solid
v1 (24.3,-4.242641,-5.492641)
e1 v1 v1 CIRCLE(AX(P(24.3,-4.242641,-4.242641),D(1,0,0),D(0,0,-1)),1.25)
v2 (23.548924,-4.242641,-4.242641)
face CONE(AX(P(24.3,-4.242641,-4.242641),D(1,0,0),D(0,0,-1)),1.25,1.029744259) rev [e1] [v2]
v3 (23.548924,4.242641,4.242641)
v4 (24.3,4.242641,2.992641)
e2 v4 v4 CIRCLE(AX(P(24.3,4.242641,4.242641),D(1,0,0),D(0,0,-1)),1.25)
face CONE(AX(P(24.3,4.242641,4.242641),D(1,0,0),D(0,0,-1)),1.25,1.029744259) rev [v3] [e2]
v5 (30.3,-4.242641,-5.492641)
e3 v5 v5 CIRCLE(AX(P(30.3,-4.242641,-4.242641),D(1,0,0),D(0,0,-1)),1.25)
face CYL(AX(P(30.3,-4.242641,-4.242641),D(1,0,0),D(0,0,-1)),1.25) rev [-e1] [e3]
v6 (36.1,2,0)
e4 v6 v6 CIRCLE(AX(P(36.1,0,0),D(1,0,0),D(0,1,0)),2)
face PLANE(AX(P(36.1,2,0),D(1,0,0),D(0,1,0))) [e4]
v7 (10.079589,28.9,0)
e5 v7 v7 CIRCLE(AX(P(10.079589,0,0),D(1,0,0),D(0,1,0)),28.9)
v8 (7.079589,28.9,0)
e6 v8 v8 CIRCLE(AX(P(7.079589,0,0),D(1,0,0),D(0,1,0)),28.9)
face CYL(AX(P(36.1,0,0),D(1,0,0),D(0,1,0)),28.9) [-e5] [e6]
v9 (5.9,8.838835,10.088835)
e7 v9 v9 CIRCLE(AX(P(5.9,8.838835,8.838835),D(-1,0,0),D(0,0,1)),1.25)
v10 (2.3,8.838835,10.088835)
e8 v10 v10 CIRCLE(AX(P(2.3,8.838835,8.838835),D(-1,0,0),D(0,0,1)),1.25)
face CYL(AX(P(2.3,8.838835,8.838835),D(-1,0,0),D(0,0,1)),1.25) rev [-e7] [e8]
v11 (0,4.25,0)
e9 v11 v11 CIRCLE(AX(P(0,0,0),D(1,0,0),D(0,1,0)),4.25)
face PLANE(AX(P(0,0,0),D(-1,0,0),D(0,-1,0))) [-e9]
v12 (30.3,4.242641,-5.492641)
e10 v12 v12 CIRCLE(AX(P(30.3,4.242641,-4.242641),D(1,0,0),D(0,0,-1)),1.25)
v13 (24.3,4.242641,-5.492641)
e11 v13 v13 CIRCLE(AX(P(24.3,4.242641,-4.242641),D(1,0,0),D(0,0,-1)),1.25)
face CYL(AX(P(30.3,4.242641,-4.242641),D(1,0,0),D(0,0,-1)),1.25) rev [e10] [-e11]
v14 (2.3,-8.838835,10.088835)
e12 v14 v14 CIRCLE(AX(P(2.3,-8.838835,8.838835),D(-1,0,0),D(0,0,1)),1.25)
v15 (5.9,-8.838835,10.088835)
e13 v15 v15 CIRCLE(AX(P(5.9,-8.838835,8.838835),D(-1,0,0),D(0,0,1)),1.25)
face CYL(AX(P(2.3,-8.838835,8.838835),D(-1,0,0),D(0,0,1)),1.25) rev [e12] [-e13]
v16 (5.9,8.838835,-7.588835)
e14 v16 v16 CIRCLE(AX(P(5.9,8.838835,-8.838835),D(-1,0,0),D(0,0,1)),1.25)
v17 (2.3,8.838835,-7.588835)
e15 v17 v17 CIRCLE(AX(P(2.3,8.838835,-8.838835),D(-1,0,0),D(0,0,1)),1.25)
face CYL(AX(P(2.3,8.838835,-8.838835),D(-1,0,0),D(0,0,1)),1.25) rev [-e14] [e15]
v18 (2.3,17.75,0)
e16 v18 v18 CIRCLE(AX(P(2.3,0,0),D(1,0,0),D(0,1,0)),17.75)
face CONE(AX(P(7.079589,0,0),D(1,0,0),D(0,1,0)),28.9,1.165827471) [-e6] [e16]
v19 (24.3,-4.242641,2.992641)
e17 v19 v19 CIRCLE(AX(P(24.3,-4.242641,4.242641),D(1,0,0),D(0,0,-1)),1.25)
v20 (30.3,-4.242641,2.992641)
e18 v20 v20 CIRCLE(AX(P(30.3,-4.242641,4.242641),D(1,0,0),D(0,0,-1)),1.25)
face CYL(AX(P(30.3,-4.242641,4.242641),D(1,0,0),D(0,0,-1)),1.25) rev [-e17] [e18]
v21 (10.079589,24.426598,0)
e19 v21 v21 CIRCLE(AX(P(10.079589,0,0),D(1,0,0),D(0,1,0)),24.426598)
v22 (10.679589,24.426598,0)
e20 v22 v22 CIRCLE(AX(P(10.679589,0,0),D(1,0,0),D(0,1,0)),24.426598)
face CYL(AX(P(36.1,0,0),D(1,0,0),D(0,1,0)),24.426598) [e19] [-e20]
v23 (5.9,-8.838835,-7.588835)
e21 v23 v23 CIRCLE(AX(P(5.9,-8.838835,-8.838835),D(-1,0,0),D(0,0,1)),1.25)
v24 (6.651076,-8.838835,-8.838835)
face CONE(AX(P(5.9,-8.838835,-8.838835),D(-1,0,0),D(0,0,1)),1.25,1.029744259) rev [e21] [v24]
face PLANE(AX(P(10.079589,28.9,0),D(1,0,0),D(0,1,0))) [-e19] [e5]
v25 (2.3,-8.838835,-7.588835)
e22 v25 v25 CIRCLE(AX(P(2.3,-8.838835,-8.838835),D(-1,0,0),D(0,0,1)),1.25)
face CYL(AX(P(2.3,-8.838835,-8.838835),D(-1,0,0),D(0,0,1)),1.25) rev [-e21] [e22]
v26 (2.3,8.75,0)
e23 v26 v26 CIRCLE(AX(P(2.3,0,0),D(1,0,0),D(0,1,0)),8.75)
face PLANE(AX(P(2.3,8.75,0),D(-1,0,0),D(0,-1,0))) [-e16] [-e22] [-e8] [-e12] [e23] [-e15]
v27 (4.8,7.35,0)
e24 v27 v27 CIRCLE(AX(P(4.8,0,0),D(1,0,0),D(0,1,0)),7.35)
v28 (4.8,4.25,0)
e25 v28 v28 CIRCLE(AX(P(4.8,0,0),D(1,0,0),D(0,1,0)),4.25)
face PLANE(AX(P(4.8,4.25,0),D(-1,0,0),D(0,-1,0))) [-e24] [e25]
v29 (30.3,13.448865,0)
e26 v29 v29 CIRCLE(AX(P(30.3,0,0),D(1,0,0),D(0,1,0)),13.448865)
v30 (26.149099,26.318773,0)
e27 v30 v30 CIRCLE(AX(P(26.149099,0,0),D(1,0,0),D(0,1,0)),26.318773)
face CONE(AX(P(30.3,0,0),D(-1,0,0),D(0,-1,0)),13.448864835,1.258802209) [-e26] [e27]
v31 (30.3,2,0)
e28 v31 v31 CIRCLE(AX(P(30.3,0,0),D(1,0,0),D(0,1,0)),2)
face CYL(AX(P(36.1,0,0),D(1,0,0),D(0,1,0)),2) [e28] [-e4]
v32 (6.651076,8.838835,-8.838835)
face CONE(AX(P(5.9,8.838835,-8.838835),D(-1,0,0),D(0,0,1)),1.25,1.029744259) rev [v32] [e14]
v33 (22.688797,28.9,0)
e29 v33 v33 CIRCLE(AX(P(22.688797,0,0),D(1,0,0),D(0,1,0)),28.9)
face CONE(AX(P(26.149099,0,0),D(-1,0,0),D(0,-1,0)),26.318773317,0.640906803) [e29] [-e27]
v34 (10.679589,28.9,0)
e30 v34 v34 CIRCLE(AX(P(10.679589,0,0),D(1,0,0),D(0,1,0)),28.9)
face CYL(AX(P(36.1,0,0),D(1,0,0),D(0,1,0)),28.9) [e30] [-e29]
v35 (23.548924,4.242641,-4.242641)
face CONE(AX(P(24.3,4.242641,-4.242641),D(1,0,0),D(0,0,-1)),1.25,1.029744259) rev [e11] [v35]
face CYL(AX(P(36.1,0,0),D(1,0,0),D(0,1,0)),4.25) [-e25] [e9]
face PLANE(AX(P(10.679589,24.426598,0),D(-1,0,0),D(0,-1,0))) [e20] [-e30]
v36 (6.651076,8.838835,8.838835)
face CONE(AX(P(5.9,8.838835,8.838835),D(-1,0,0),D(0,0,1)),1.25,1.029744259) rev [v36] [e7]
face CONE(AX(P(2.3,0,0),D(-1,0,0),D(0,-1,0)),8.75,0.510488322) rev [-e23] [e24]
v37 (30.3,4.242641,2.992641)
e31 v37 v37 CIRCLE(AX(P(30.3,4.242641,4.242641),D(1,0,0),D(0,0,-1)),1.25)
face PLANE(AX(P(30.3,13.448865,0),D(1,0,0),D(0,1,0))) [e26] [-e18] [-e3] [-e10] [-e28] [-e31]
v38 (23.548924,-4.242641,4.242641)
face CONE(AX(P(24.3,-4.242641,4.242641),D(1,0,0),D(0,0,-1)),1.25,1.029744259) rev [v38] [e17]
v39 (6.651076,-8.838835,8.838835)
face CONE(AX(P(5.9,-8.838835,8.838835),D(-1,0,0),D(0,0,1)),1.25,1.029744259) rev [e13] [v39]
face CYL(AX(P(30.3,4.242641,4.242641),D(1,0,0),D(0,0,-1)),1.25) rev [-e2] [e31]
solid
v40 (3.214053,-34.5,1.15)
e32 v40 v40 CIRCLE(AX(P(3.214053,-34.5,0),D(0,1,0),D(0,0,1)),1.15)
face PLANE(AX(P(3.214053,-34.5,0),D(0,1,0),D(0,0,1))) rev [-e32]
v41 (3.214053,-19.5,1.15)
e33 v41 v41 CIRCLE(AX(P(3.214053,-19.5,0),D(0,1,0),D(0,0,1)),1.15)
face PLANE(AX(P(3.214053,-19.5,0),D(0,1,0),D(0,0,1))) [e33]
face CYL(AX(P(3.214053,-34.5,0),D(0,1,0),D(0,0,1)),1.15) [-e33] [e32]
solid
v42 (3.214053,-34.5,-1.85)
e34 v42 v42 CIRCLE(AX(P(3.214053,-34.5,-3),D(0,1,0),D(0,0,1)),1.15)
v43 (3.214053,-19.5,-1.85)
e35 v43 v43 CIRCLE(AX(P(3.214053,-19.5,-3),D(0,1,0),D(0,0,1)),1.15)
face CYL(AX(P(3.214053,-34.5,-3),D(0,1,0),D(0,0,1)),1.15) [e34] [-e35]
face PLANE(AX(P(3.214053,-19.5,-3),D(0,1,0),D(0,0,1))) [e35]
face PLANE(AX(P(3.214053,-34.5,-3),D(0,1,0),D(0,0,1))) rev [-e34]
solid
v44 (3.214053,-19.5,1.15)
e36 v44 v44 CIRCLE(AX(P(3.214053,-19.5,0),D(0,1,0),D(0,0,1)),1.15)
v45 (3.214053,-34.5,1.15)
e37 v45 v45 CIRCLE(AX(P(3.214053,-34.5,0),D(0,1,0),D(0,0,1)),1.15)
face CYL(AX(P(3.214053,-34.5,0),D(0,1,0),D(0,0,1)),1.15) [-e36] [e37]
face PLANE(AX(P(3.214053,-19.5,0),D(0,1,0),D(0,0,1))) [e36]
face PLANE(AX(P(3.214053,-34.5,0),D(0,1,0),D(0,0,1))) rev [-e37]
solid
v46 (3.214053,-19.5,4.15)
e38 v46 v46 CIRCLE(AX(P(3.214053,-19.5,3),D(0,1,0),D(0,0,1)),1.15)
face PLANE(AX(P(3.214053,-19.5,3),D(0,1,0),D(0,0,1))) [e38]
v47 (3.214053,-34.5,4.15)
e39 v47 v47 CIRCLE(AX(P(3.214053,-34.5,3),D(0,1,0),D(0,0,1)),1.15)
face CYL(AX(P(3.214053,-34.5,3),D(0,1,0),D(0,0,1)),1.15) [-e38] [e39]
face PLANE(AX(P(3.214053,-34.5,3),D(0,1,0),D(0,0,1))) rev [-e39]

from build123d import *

# Parameters (mm, degrees)
TROU_POUR_TARAUDAGE_POUR_TROU_TARAUD_M3_D     = 2.5
TROU_POUR_TARAUDAGE_POUR_TROU_TARAUD_M3_DEPTH = 3.6
TROU_POUR_TARAUDAGE_POUR_TROU_TARAUD_M3_TIP   = 0.751075774
TROU_POUR_TARAUDAGE_POUR_TROU_TARAUD_2_D      = 2.5
TROU_POUR_TARAUDAGE_POUR_TROU_TARAUD_2_DEPTH  = 6
TROU_POUR_TARAUDAGE_POUR_TROU_TARAUD_2_TIP    = 0.751075774
BOSS_EXTRU_1_START                            = -19.5
ESQUISSE6_R                                   = 1.15
BOSS_EXTRU_1_DEPTH                            = 15
R_P_TITION_LIN_AIRE1_COUNT                    = 2
R_P_TITION_LIN_AIRE1_PITCH                    = 3
R_P_TITION_LIN_AIRE1_COUNT_DIR2               = 2
R_P_TITION_LIN_AIRE1_PITCH_DIR2               = 3


# Read off the part's stored shape, not the designer's step: Révolution1
with BuildPart() as part:
    # Révolution1 outline → Révolution1 (revolve)
    with BuildSketch(Plane.YX):
        Polygon((0, 36.1), (0, 0), (4.25, 0), (4.25, 4.8), (7.35, 4.8), (8.75, 2.3), (17.75, 2.3), (28.9, 7.079588628), (28.9, 10.079588628), (24.426597876, 10.079588628), (24.426597876, 10.679588628), (28.9, 10.679588628), (28.9, 22.688797149), (26.318773317, 26.149098698), (13.448864835, 30.3), (2, 30.3), (2, 36.1), align=None)
    revolve(axis=Axis((0, 0, 0), (1, 0, 0)))

    # Trou pour taraudage pour trou taraud_ M3
    with Locations(Plane.ZY.offset(-2.3)):
        with Locations((-8.838834765, 8.838834765), (8.838834765, -8.838834765), (-8.838834765, -8.838834765), (8.838834765, 8.838834765)):
            Hole(TROU_POUR_TARAUDAGE_POUR_TROU_TARAUD_M3_D / 2, depth=TROU_POUR_TARAUDAGE_POUR_TROU_TARAUD_M3_DEPTH)
            with Locations((0, 0, -(TROU_POUR_TARAUDAGE_POUR_TROU_TARAUD_M3_DEPTH + TROU_POUR_TARAUDAGE_POUR_TROU_TARAUD_M3_TIP / 2))):  # 118° drill point
                Cone(0, TROU_POUR_TARAUDAGE_POUR_TROU_TARAUD_M3_D / 2, TROU_POUR_TARAUDAGE_POUR_TROU_TARAUD_M3_TIP, mode=Mode.SUBTRACT)

    # Trou pour taraudage pour trou taraud 2
    with Locations(Plane(origin=(30.3, 0, 0), x_dir=(0, 0, -1), z_dir=(1, 0, 0))):
        with Locations((-4.242640687, 4.242640687), (4.242640687, -4.242640687), (-4.242640687, -4.242640687), (4.242640687, 4.242640687)):
            Hole(TROU_POUR_TARAUDAGE_POUR_TROU_TARAUD_2_D / 2, depth=TROU_POUR_TARAUDAGE_POUR_TROU_TARAUD_2_DEPTH)
            with Locations((0, 0, -(TROU_POUR_TARAUDAGE_POUR_TROU_TARAUD_2_DEPTH + TROU_POUR_TARAUDAGE_POUR_TROU_TARAUD_2_TIP / 2))):  # 118° drill point
                Cone(0, TROU_POUR_TARAUDAGE_POUR_TROU_TARAUD_2_D / 2, TROU_POUR_TARAUDAGE_POUR_TROU_TARAUD_2_TIP, mode=Mode.SUBTRACT)


with BuildPart() as body_2:
    # Esquisse6 → Boss.-Extru.1 (new body)
    with BuildSketch(Plane(origin=(0, 0, 0), x_dir=(1, 0, 0), z_dir=(0, 1, 0)).offset(BOSS_EXTRU_1_START)):
        with Locations(Location((3.214052754, 0, 0), (0, 0, 270))):
            Circle(ESQUISSE6_R)
    boss_extru_1 = extrude(amount=-BOSS_EXTRU_1_DEPTH)


with BuildPart() as r_p_tition_lin_aire1_1:
    # Répétition linéaire1: Boss.-Extru.1 2 × 2
    with Locations(*[Vector(0, 0, 1) * (i * R_P_TITION_LIN_AIRE1_PITCH) + Vector(0, 0, -1) * (j * R_P_TITION_LIN_AIRE1_PITCH_DIR2) for i in range(R_P_TITION_LIN_AIRE1_COUNT) for j in range(R_P_TITION_LIN_AIRE1_COUNT_DIR2) if (i, j) != (0, 0)]):
        add(boss_extru_1)


solid = Compound([part.part, body_2.part, r_p_tition_lin_aire1_1.part])
